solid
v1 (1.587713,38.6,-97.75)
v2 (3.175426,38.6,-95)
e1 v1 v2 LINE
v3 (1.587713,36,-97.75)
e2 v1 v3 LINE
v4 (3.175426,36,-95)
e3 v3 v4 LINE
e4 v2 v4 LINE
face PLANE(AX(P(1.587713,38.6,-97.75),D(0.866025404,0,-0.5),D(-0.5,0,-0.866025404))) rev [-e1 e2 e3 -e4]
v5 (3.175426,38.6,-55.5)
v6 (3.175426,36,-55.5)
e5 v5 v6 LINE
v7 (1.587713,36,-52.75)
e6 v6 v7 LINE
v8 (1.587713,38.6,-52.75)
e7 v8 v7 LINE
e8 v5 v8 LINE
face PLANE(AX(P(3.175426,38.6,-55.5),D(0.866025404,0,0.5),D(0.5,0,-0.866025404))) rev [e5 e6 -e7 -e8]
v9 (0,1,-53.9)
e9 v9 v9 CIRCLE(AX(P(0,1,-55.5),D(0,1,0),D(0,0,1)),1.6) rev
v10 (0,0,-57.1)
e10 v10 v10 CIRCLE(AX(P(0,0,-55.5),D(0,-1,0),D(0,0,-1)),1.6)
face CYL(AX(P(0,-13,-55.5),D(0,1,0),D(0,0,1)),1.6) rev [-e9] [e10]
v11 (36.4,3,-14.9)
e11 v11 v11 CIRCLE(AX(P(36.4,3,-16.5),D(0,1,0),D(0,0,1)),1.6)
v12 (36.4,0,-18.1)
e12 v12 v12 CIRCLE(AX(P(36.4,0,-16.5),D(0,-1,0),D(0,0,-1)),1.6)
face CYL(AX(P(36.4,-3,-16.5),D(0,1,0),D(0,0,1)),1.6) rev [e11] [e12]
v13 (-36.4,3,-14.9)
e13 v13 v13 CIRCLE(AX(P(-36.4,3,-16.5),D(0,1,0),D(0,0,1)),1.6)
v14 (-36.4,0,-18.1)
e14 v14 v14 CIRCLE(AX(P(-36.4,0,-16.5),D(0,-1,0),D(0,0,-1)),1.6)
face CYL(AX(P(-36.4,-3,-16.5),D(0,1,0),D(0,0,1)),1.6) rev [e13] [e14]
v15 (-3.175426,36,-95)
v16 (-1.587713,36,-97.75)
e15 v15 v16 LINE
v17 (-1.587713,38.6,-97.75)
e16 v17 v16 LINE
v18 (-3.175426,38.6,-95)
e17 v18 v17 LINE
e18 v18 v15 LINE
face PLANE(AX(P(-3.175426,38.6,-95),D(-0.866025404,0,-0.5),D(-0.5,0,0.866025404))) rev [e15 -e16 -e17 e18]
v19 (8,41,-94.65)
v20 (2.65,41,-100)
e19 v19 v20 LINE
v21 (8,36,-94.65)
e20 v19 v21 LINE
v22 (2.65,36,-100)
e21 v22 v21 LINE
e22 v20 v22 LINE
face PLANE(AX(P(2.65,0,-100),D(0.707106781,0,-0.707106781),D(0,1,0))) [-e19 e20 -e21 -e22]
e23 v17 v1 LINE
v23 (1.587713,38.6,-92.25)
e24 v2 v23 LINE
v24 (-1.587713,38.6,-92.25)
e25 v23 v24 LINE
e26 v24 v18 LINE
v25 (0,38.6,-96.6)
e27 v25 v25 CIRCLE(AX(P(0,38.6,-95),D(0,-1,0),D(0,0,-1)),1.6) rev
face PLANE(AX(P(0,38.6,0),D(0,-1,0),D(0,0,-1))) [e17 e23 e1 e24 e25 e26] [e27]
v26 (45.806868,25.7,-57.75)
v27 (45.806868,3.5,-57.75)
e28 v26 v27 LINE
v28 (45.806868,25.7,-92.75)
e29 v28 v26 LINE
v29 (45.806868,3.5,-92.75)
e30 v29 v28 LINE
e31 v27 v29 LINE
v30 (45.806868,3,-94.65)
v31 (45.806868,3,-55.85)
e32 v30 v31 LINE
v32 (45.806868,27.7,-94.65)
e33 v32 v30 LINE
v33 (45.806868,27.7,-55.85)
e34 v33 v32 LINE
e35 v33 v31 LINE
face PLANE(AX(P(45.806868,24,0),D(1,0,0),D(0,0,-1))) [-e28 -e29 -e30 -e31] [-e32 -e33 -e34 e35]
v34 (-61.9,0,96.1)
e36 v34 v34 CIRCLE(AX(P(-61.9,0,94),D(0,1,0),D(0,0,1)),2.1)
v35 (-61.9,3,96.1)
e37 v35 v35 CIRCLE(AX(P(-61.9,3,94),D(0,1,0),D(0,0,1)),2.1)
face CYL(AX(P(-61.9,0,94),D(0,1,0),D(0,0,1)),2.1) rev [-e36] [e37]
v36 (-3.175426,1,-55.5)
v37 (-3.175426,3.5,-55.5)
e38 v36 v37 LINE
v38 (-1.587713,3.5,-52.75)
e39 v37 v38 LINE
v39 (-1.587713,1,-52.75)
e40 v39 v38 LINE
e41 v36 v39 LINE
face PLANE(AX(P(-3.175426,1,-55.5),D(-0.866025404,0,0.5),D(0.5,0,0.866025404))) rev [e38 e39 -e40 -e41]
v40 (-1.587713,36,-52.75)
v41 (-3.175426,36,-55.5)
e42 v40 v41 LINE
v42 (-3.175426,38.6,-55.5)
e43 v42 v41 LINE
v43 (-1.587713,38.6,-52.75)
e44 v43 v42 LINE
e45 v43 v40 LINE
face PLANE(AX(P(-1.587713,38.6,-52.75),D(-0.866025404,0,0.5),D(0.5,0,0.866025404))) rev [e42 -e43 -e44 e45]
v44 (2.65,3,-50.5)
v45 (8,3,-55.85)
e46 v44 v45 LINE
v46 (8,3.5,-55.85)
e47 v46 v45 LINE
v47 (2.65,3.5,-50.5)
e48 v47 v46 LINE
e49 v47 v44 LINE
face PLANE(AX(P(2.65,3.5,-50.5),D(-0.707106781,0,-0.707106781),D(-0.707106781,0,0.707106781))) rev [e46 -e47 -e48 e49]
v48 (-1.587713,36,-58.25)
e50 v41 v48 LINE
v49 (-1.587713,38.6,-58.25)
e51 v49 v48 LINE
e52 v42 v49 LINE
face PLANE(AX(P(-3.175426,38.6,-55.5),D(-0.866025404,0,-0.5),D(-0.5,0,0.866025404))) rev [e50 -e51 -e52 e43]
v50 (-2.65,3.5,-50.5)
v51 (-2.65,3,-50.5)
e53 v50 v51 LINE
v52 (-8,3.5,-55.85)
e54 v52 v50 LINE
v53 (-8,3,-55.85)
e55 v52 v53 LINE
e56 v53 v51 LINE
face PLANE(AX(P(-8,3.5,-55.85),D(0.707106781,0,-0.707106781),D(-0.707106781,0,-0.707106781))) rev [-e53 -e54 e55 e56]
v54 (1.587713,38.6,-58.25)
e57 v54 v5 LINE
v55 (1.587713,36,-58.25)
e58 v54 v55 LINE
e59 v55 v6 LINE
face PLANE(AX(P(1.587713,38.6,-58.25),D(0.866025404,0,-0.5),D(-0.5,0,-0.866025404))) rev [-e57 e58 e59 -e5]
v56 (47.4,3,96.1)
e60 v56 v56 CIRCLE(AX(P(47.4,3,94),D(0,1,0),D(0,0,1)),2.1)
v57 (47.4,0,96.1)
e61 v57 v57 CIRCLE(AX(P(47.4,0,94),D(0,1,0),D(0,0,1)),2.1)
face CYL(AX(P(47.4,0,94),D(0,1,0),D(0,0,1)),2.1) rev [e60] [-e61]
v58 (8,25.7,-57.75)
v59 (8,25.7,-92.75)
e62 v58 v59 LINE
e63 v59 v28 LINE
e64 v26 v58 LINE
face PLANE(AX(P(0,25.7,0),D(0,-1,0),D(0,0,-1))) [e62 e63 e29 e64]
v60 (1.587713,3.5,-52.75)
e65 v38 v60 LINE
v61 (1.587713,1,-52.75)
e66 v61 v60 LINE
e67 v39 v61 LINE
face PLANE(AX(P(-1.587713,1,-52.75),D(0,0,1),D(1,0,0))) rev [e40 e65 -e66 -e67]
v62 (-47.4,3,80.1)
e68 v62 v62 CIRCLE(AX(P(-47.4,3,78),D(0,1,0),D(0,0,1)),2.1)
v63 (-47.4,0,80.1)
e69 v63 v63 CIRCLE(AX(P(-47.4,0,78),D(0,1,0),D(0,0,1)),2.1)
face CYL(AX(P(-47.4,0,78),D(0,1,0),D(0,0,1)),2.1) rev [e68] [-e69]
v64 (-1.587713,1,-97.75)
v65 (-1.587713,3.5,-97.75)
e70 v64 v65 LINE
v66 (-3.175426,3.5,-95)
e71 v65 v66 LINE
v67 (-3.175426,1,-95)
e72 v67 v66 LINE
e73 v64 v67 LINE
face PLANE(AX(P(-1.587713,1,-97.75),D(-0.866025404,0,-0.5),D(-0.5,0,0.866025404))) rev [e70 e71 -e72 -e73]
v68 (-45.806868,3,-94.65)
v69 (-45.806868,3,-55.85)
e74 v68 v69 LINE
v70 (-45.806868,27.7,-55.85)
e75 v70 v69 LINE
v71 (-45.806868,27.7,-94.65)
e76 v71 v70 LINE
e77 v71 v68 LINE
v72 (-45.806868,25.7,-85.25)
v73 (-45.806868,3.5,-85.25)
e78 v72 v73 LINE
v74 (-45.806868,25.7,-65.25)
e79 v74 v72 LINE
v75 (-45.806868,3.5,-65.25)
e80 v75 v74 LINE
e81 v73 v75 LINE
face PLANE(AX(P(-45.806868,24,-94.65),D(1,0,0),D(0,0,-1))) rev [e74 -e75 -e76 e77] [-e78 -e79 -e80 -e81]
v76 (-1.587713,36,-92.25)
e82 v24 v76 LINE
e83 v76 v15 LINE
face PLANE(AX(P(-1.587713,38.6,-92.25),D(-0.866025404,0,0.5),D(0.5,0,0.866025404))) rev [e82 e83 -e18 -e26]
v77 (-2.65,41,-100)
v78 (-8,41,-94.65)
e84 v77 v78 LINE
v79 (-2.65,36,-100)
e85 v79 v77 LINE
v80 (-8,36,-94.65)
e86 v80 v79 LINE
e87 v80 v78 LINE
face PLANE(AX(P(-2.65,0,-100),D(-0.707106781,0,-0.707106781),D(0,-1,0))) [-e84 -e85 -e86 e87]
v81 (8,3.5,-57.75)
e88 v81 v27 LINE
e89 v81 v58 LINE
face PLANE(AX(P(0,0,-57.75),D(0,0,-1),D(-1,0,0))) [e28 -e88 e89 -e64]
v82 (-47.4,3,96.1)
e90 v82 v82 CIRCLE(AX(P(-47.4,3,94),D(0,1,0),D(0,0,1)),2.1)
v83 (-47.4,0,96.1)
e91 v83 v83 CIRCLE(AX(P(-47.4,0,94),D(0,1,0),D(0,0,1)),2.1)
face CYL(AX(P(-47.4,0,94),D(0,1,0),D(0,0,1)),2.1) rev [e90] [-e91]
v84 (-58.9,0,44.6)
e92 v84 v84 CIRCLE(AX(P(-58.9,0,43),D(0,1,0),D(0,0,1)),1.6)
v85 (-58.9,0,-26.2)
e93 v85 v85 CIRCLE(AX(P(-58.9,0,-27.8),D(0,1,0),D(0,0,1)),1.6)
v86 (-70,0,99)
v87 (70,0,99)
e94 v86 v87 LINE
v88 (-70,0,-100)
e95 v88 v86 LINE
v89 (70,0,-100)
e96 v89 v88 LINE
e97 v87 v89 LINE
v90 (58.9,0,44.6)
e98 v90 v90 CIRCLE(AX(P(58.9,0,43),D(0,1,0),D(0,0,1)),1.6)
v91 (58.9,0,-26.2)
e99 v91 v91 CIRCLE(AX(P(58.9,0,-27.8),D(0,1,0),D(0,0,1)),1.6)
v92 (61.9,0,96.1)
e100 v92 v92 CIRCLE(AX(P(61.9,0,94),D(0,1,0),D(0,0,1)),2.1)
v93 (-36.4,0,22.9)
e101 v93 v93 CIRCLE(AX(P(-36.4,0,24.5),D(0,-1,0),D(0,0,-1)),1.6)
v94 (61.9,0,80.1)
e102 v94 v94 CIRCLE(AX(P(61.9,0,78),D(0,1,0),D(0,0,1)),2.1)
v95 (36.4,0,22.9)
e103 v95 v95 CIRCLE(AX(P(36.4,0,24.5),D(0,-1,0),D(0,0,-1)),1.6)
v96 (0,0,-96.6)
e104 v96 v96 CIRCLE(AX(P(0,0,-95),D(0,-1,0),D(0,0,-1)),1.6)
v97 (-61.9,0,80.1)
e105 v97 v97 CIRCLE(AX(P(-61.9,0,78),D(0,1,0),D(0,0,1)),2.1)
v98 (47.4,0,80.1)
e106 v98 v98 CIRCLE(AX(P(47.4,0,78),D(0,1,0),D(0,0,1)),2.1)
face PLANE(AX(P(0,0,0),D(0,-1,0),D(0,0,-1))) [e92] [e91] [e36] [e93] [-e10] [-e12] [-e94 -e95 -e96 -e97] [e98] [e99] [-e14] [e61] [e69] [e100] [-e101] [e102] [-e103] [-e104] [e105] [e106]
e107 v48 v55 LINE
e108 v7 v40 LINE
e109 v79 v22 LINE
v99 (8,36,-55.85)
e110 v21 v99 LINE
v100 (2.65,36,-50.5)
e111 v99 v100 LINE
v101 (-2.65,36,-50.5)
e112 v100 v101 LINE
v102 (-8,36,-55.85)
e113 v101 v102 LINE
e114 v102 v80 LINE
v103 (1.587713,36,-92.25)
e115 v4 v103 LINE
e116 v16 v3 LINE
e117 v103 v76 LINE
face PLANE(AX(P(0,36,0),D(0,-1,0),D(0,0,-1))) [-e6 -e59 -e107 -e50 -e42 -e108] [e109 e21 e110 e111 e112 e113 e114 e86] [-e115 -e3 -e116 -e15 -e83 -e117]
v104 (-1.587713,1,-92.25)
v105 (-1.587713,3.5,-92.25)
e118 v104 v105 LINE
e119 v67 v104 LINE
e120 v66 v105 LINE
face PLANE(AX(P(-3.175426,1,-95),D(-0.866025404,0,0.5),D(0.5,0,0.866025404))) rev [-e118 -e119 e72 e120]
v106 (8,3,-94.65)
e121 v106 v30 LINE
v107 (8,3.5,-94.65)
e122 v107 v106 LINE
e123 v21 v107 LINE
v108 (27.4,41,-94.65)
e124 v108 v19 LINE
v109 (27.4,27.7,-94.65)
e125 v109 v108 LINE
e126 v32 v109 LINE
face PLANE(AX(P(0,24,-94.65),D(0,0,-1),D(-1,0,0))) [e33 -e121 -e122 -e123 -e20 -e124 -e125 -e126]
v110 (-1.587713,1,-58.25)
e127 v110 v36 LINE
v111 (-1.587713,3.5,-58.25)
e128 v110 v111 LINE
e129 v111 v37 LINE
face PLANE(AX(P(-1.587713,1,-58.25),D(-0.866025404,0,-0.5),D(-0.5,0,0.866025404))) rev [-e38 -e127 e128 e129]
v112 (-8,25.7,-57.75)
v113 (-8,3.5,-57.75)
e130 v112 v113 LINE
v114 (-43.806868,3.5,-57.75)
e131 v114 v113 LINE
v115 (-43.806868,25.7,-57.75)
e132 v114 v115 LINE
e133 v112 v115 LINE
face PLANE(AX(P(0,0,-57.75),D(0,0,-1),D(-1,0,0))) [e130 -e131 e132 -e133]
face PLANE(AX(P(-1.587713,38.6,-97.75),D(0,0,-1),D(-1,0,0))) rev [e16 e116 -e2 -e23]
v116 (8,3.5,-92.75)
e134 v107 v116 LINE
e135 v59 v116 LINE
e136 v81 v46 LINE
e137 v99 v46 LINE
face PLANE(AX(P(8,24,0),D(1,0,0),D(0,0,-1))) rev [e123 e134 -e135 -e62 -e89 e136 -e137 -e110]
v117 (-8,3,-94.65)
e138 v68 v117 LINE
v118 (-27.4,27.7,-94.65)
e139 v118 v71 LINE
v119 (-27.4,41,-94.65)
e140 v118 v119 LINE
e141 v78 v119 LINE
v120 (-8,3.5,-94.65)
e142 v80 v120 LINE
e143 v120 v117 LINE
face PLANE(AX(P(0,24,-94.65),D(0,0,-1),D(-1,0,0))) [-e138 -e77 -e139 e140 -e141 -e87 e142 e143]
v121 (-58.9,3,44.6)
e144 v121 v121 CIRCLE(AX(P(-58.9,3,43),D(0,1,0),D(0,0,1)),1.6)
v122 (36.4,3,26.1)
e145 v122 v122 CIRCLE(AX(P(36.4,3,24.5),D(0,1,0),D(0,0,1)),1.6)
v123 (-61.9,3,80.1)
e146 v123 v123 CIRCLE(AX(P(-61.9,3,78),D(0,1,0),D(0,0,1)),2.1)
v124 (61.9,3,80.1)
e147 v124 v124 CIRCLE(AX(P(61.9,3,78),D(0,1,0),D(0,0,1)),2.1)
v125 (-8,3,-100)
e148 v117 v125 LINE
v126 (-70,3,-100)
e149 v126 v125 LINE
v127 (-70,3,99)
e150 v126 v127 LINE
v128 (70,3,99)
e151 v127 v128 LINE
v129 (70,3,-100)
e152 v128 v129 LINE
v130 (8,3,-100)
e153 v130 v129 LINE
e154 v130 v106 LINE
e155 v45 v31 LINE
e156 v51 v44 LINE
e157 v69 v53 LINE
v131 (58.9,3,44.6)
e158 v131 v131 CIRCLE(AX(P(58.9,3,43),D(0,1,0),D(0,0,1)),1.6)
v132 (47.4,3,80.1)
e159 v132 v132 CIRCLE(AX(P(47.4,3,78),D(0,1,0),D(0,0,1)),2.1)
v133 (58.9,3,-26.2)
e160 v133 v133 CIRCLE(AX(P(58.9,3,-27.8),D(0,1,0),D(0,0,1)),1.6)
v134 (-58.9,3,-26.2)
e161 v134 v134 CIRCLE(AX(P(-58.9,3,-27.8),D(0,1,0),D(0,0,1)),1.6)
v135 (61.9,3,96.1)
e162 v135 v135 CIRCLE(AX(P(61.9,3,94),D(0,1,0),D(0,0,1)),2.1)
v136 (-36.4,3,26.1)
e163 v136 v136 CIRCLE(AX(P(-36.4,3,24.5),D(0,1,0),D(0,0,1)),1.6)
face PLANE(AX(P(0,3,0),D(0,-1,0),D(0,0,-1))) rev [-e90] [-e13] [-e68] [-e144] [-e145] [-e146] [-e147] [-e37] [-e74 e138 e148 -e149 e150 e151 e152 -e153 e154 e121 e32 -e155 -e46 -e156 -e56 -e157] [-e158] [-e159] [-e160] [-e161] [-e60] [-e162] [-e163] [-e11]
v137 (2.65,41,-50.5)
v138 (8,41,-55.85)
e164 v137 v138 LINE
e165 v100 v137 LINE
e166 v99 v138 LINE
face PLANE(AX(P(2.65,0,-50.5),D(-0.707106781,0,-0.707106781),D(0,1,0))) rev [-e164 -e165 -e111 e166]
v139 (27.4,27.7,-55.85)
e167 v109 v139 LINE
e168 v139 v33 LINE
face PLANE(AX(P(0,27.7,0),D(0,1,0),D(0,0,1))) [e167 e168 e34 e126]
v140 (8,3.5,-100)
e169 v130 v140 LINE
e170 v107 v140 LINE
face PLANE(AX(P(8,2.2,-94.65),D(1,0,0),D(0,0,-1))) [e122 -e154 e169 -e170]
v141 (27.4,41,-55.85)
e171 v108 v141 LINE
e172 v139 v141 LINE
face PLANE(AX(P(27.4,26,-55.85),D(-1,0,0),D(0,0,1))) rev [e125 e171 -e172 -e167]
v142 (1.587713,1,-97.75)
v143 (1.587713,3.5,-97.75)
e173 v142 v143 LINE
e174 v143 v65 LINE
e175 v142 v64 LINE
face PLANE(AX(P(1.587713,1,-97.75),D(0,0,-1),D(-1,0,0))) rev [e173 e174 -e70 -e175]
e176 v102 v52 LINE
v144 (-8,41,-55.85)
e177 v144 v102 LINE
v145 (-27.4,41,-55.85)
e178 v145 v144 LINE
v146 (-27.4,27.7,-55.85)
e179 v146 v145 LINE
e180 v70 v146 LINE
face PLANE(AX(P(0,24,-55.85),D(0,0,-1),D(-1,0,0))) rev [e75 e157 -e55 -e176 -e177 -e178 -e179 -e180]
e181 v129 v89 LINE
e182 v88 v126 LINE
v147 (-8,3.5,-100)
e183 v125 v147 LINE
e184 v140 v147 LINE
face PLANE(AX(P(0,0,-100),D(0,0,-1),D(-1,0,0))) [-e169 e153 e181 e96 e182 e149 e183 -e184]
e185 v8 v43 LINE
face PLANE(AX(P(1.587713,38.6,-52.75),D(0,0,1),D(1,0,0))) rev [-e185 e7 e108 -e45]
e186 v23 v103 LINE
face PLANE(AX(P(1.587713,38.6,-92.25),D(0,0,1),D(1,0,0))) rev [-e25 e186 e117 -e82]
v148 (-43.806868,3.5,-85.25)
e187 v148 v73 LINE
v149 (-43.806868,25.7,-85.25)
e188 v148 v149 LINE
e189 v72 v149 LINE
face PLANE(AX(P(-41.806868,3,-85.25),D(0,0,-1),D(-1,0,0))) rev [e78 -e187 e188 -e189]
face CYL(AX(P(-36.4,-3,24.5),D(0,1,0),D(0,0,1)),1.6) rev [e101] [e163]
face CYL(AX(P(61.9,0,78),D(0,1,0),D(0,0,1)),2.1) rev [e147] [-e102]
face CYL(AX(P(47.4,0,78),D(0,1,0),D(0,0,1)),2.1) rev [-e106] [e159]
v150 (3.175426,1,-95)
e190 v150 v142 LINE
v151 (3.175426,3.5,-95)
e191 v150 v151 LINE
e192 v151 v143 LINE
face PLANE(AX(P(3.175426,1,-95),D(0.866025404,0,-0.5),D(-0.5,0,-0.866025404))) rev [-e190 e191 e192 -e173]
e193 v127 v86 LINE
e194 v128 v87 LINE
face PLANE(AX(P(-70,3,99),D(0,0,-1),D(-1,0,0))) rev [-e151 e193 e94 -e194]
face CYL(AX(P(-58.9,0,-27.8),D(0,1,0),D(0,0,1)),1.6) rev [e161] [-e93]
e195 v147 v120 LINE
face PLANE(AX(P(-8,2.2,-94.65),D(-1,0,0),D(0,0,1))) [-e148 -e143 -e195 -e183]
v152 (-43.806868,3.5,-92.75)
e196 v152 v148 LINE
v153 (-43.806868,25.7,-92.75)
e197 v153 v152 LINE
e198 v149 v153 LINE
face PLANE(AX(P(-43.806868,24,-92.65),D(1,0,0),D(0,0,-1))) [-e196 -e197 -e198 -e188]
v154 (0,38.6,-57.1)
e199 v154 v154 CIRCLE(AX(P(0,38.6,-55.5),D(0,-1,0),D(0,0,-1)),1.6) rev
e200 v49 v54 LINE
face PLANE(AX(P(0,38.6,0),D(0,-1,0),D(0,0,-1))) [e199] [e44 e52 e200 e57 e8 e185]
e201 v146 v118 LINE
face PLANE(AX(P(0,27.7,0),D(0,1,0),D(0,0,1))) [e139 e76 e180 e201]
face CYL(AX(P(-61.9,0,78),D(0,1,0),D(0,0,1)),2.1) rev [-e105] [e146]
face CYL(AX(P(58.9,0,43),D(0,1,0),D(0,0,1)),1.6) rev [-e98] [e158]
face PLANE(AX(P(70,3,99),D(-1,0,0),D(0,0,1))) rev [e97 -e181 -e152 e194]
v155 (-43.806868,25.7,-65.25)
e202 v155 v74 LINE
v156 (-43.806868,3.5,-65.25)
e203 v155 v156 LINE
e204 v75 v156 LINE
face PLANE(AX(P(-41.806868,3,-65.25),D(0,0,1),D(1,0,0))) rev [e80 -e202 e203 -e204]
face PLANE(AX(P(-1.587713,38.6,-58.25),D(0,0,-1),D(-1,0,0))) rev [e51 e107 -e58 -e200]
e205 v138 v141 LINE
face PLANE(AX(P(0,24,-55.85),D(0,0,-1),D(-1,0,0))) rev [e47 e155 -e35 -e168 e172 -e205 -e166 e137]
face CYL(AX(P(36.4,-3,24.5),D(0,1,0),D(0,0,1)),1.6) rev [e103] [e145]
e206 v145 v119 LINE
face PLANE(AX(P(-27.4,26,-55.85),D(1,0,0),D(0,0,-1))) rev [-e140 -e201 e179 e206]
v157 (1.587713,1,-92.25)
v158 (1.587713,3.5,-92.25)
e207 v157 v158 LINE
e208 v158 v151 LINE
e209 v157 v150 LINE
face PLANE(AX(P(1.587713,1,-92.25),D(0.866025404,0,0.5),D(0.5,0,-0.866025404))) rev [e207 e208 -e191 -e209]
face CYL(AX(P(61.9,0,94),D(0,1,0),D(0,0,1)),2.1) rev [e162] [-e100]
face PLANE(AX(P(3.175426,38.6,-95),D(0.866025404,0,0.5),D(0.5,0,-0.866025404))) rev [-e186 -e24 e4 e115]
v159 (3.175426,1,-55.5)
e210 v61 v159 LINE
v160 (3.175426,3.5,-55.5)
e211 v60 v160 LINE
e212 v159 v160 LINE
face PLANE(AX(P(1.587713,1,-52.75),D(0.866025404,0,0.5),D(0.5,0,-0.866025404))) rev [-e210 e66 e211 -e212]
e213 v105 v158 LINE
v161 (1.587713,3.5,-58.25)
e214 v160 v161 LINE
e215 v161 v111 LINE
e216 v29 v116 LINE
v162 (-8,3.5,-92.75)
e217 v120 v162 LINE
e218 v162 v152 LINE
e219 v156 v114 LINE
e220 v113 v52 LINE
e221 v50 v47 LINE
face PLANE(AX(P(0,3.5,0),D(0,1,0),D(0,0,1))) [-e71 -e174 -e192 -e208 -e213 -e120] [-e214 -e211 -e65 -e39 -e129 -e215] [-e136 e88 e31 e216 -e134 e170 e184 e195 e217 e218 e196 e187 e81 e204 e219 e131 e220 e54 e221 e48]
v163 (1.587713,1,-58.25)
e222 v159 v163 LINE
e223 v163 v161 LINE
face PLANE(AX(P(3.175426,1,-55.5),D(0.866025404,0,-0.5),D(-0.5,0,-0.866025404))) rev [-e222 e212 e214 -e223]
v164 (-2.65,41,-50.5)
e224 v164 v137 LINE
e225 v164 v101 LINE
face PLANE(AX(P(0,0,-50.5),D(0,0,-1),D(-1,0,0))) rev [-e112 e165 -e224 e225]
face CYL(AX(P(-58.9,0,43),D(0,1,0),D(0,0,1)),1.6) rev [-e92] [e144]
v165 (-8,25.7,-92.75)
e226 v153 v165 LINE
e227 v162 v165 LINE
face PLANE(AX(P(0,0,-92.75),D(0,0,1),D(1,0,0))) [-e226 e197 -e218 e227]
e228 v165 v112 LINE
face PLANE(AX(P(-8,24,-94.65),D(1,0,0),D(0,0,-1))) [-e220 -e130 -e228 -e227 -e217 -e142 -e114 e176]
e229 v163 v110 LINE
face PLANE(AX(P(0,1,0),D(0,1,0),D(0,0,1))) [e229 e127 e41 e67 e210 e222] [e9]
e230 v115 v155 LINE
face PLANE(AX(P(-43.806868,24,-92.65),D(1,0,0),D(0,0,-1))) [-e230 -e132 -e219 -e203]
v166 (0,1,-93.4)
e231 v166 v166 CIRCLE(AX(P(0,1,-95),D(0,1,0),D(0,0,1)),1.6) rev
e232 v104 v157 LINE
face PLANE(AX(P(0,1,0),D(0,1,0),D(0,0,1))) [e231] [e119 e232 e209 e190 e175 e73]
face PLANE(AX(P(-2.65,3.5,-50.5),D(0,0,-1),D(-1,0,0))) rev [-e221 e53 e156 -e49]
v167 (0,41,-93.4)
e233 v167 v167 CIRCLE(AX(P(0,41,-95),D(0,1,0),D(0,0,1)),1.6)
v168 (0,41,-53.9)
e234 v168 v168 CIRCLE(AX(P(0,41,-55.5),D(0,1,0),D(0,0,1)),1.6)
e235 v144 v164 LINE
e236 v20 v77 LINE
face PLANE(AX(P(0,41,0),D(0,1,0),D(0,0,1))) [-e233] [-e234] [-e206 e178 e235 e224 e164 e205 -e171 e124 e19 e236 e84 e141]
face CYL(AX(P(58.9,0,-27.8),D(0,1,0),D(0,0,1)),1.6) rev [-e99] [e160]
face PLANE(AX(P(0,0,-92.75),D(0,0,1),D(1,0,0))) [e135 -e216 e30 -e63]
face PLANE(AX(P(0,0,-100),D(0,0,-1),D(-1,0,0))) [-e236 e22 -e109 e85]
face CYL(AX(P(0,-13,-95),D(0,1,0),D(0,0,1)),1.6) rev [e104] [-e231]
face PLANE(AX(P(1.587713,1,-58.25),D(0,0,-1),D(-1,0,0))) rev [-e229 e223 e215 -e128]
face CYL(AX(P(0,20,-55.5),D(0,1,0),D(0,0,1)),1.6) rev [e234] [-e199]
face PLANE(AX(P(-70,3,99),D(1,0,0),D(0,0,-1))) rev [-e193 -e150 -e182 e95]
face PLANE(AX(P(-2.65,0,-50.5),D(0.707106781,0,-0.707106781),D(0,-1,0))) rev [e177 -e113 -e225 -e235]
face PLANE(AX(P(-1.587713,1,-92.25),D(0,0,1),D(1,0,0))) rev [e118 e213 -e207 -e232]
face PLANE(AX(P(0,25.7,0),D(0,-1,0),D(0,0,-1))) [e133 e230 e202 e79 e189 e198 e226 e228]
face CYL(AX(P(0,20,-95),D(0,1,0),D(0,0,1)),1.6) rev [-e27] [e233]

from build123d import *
from build123d.topology import SkipClean

# Parameters (mm, degrees)
SKETCH1_W            = 140
SKETCH1_H            = 198
BOSS_EXTRUDE1_DEPTH  = 3
SKETCH2_R            = 2.1
CUT_EXTRUDE1_DEPTH   = 3
SKETCH3_R            = 1.6
CUT_EXTRUDE2_DEPTH   = 3
SKETCH4_W            = 140
SKETCH4_H            = 3
BOSS_EXTRUDE2_DEPTH  = 1
SKETCH5_R            = 1.6
CUT_EXTRUDE3_DEPTH   = 16
BOSS_EXTRUDE3_DEPTH  = 21
SKETCH7_W            = 34.8
SKETCH7_H            = 21
CUT_EXTRUDE4_DEPTH   = 21
SKETCH9_W            = 91.613735238
SKETCH9_H            = 38.8
BOSS_EXTRUDE4_DEPTH  = 2
SKETCH12_W           = 20
SKETCH12_H           = 23
CUT_EXTRUDE8_DEPTH   = 4
SKETCH13_W           = 20
SKETCH13_H           = 2
BOSS_EXTRUDE5_DEPTH  = 4
SKETCH15_W           = 16
SKETCH15_H           = 2
BOSS_EXTRUDE6_DEPTH  = 5.35
SKETCH16_W           = 16
SKETCH16_H           = 2
BOSS_EXTRUDE7_DEPTH  = 5.35
SKETCH17_R           = 1.6
CUT_EXTRUDE9_DEPTH   = 6
CHAMFER1_SIZE        = 5.35
SKETCH18_R           = 1.6
CUT_EXTRUDE10_DEPTH  = 6
BOSS_EXTRUDE8_START  = 15
SKETCH19_R           = 1.6
BOSS_EXTRUDE8_DEPTH  = 15
CUT_EXTRUDE11_DEPTH  = 12
SKETCH21_W           = 18.406867619
SKETCH21_H           = 38.8
CUT_EXTRUDE12_DEPTH  = 15
SKETCH22_W           = 37.806867619
SKETCH22_H           = 34.8
CUT_EXTRUDE13_DEPTH  = 1
SKETCH23_W           = 18.406867619
SKETCH23_H           = 38.8
BOSS_EXTRUDE9_DEPTH  = 1
SKETCH24_W           = 37.806867619
SKETCH24_H           = 22
SKETCH24_W_2         = 35.806867619
CUT_EXTRUDE14_DEPTH  = 0.1
SKETCH25_W           = 37.806867619
SKETCH25_H           = 22
SKETCH25_W_2         = 35.806867619
CUT_EXTRUDE15_DEPTH  = 0.1
CUT_EXTRUDE16_DEPTH  = 2.6
CUT_EXTRUDE17_DEPTH  = 2
SKETCH28_W           = 37.806867619
SKETCH28_H           = 35
CUT_EXTRUDE18_DEPTH  = 0.5
SKETCH29_W           = 18.406867619
SKETCH29_H           = 38.8
CUT_EXTRUDE19_DEPTH  = 0.5
SKETCH30_W           = 37.806867619
SKETCH30_H           = 35
BOSS_EXTRUDE10_DEPTH = 0.5
SKETCH31_R           = 1.6
BOSS_EXTRUDE11_DEPTH = 0.5
CUT_EXTRUDE20_DEPTH  = 2.5
SKETCH33_W           = 37.806867619
SKETCH33_H           = 35
CUT_EXTRUDE21_DEPTH  = 0.2
BOSS_EXTRUDE12_DEPTH = 1.3
SKETCH35_W           = 18.406867619
SKETCH35_H           = 38.8
BOSS_EXTRUDE13_DEPTH = 1.2


with BuildPart() as part:
    # Sketch1 → Boss-Extrude1 (new body)
    with BuildSketch(Plane(origin=(0, 0, 0), x_dir=(1, 0, 0), z_dir=(0, 1, 0))):
        Rectangle(SKETCH1_W, SKETCH1_H)
    extrude(amount=BOSS_EXTRUDE1_DEPTH)

    # Sketch2 → Cut-Extrude1 (cut)
    with BuildSketch(Plane(origin=(0, 3, 0), x_dir=(1, 0, 0), z_dir=(0, 1, 0))):
        with Locations(Location((-47.4, -94, 0), (0, 0, 270))):
            Circle(SKETCH2_R)
        with Locations(Location((47.4, -94, 0), (0, 0, 270))):
            Circle(SKETCH2_R)
        with Locations(Location((-61.9, -94, 0), (0, 0, 270))):
            Circle(SKETCH2_R)
        with Locations(Location((61.9, -94, 0), (0, 0, 270))):
            Circle(SKETCH2_R)
        with Locations(Location((-47.4, -78, 0), (0, 0, 270))):
            Circle(SKETCH2_R)
        with Locations(Location((-61.9, -78, 0), (0, 0, 270))):
            Circle(SKETCH2_R)
        with Locations(Location((61.9, -78, 0), (0, 0, 270))):
            Circle(SKETCH2_R)
        with Locations(Location((47.4, -78, 0), (0, 0, 270))):
            Circle(SKETCH2_R)
    extrude(amount=-CUT_EXTRUDE1_DEPTH, mode=Mode.SUBTRACT)

    # Sketch3 → Cut-Extrude2 (cut)
    with BuildSketch(Plane(origin=(0, 3, 0), x_dir=(1, 0, 0), z_dir=(0, 1, 0))):
        with Locations(Location((-58.9, 27.8, 0), (0, 0, 270))):
            Circle(SKETCH3_R)
        with Locations(Location((-58.9, -43, 0), (0, 0, 270))):
            Circle(SKETCH3_R)
        with Locations(Location((58.9, -43, 0), (0, 0, 270))):
            Circle(SKETCH3_R)
        with Locations(Location((58.9, 27.8, 0), (0, 0, 270))):
            Circle(SKETCH3_R)
    extrude(amount=-CUT_EXTRUDE2_DEPTH, mode=Mode.SUBTRACT)

    # Sketch4 → Boss-Extrude2 (add)
    with BuildSketch(Plane(origin=(0, 0, -99), x_dir=(-1, 0, 0), z_dir=(0, 0, -1))):
        with Locations((0, 1.5)):
            Rectangle(SKETCH4_W, SKETCH4_H)
    extrude(amount=BOSS_EXTRUDE2_DEPTH)

    # Sketch5 → Cut-Extrude3 (cut)
    with BuildSketch(Plane(origin=(0, 3, 0), x_dir=(1, 0, 0), z_dir=(0, 1, 0))):
        with Locations(Location((0, 95, 0), (0, 0, 270))):
            Circle(SKETCH5_R)
        with Locations(Location((0, 55.5, 0), (0, 0, 270))):
            Circle(SKETCH5_R)
    extrude(amount=-CUT_EXTRUDE3_DEPTH, mode=Mode.SUBTRACT)

    # Sketch6 → Boss-Extrude3 (add)
    with BuildSketch(Plane(origin=(0, 3, 0), x_dir=(1, 0, 0), z_dir=(0, 1, 0))):
        Polygon((-45.806867619, 94.65), (-8, 94.65), (-8, 92.65), (-43.806867619, 92.65), (-43.806867619, 57.85), (-8, 57.85), (-8, 55.85), (-45.806867619, 55.85), align=None)
        Polygon((43.806867619, 92.65), (43.806867619, 57.85), (8, 57.85), (8, 55.85), (45.806867619, 55.85), (45.806867619, 94.65), (8, 94.65), (8, 92.65), align=None)
    extrude(amount=BOSS_EXTRUDE3_DEPTH)

    # Sketch7 → Cut-Extrude4 (cut)
    with BuildSketch(Plane.ZY.offset(-43.806867619)):
        with Locations((-75.25, 13.5)):
            Rectangle(SKETCH7_W, SKETCH7_H)
    extrude(amount=-CUT_EXTRUDE4_DEPTH, mode=Mode.SUBTRACT)

    # Sketch9 → Boss-Extrude4 (add)
    with BuildSketch(Plane(origin=(0, 24, 0), x_dir=(1, 0, 0), z_dir=(0, 1, 0))):
        with Locations((0, 75.25)):
            Rectangle(SKETCH9_W, SKETCH9_H)
    extrude(amount=BOSS_EXTRUDE4_DEPTH)

    # Sketch12 → Cut-Extrude8 (cut)
    with BuildSketch(Plane.ZY.offset(45.806867619)):
        with Locations((-75.25, 14.5)):
            Rectangle(SKETCH12_W, SKETCH12_H)
    extrude(amount=-CUT_EXTRUDE8_DEPTH, mode=Mode.SUBTRACT)

    # Sketch13 → Boss-Extrude5 (add)
    with BuildSketch(Plane.ZY.offset(41.806867619)):
        with Locations((-75.25, 25)):
            Rectangle(SKETCH13_W, SKETCH13_H)
    extrude(amount=BOSS_EXTRUDE5_DEPTH)

    # Sketch15 → Boss-Extrude6 (add)
    with BuildSketch(Plane.XY.offset(-55.85)):
        with Locations((0, 25)):
            Rectangle(SKETCH15_W, SKETCH15_H)
    extrude(amount=BOSS_EXTRUDE6_DEPTH)

    # Sketch16 → Boss-Extrude7 (add)
    with BuildSketch(Plane(origin=(0, 0, -94.65), x_dir=(-1, 0, 0), z_dir=(0, 0, -1))):
        with Locations((0, 25)):
            Rectangle(SKETCH16_W, SKETCH16_H)
    extrude(amount=BOSS_EXTRUDE7_DEPTH)

    # Sketch17 → Cut-Extrude9 (cut)
    with BuildSketch(Plane(origin=(0, 26, 0), x_dir=(1, 0, 0), z_dir=(0, 1, 0))):
        with Locations(Location((0, 55.5, 0), (0, 0, 270))):
            Circle(SKETCH17_R)
        with Locations(Location((0, 95, 0), (0, 0, 270))):
            Circle(SKETCH17_R)
    extrude(amount=-CUT_EXTRUDE9_DEPTH, mode=Mode.SUBTRACT)

    # Chamfer1
    chamfer1_edges = [part.edges().sort_by_distance(p)[0] for p in [
        (-8, 25, -50.5),
        (8, 25, -50.5),
        (8, 25, -100),
        (-8, 25, -100),
    ]]
    chamfer(chamfer1_edges, length=CHAMFER1_SIZE - 0.0001)  # a hair under: the kernel refuses the full size

    # Sketch18 → Cut-Extrude10 (cut)
    with BuildSketch(Plane(origin=(0, 3, 0), x_dir=(1, 0, 0), z_dir=(0, 1, 0))):
        with Locations(Location((36.4, -24.5, 0), (0, 0, 270))):
            Circle(SKETCH18_R)
        with Locations(Location((36.4, 16.5, 0), (0, 0, 270))):
            Circle(SKETCH18_R)
        with Locations(Location((-36.4, 16.5, 0), (0, 0, 270))):
            Circle(SKETCH18_R)
        with Locations(Location((-36.4, -24.5, 0), (0, 0, 270))):
            Circle(SKETCH18_R)
    extrude(amount=-CUT_EXTRUDE10_DEPTH, mode=Mode.SUBTRACT)

    # Sketch19 → Boss-Extrude8 (add)
    with SkipClean():  # the faces are left unmerged after this step: merging them gives an invalid solid
        with BuildSketch(Plane(origin=(0, 26, 0), x_dir=(1, 0, 0), z_dir=(0, 1, 0)).offset(BOSS_EXTRUDE8_START)):
            Polygon((-45.806867619, 55.85), (-8, 55.85), (-2.65, 50.5), (2.65, 50.5), (8, 55.85), (45.806867619, 55.85), (45.806867619, 94.65), (8, 94.65), (2.65, 100), (-2.65, 100), (-8, 94.65), (-45.806867619, 94.65), align=None)
            with Locations(Location((0, 95, 0), (0, 0, 270))):
                Circle(SKETCH19_R, mode=Mode.SUBTRACT)
            with Locations(Location((0, 55.5, 0), (0, 0, 270))):
                Circle(SKETCH19_R, mode=Mode.SUBTRACT)
        extrude(amount=-BOSS_EXTRUDE8_DEPTH)

    # Sketch20 → Cut-Extrude11 (cut)
    with SkipClean():  # the faces are left unmerged after this step: merging them gives an invalid solid
        with BuildSketch(Plane.XZ.offset(-24)):
            Polygon((-8, -55.85), (-8, -94.65), (-2.65, -100), (2.65, -100), (8, -94.65), (8, -55.85), (2.65, -50.5), (-2.65, -50.5), align=None)
        extrude(amount=-CUT_EXTRUDE11_DEPTH, mode=Mode.SUBTRACT)


with BuildPart() as cut_extrude11_kept_piece:
    # of the separate pieces the step leaves, the one the design keeps (cut_extrude11_pieces_kept)
    add(part.part.solids().sort_by_distance((-45.806867619, 26, -94.65))[0])

    # Sketch21 → Cut-Extrude12 (cut)
    with BuildSketch(Plane(origin=(0, 41, 0), x_dir=(1, 0, 0), z_dir=(0, 1, 0))):
        with Locations((-36.60343381, 75.25)):
            Rectangle(SKETCH21_W, SKETCH21_H)
        with Locations((36.60343381, 75.25)):
            Rectangle(SKETCH21_W, SKETCH21_H)
    extrude(amount=-CUT_EXTRUDE12_DEPTH, mode=Mode.SUBTRACT)

    # Sketch22 → Cut-Extrude13 (cut)
    with BuildSketch(Plane.XZ.offset(-24)):
        with Locations((26.90343381, -75.25)):
            Rectangle(SKETCH22_W, SKETCH22_H)
        Polygon((-43.806867619, -92.65), (-8, -92.65), (-8, -57.85), (-43.806867619, -57.85), (-43.806867619, -65.25), (-45.806867619, -65.25), (-45.806867619, -85.25), (-43.806867619, -85.25), align=None)
    extrude(amount=-CUT_EXTRUDE13_DEPTH, mode=Mode.SUBTRACT)

    # Sketch23 → Boss-Extrude9 (add)
    with BuildSketch(Plane(origin=(0, 26, 0), x_dir=(1, 0, 0), z_dir=(0, 1, 0))):
        with Locations((36.60343381, 75.25)):
            Rectangle(SKETCH23_W, SKETCH23_H)
        with Locations((-36.60343381, 75.25)):
            Rectangle(SKETCH23_W, SKETCH23_H)
    extrude(amount=BOSS_EXTRUDE9_DEPTH)

    # Sketch24 → Cut-Extrude14 (cut)
    with BuildSketch(Plane(origin=(0, 0, -57.85), x_dir=(-1, 0, 0), z_dir=(0, 0, -1))):
        with Locations((-26.90343381, 14)):
            Rectangle(SKETCH24_W, SKETCH24_H)
        with Locations((25.90343381, 14)):
            Rectangle(SKETCH24_W_2, SKETCH24_H)
    extrude(amount=-CUT_EXTRUDE14_DEPTH, mode=Mode.SUBTRACT)

    # Sketch25 → Cut-Extrude15 (cut)
    with BuildSketch(Plane.XY.offset(-92.65)):
        with Locations((26.90343381, 14)):
            Rectangle(SKETCH25_W, SKETCH25_H)
        with Locations((-25.90343381, 14)):
            Rectangle(SKETCH25_W_2, SKETCH25_H)
    extrude(amount=-CUT_EXTRUDE15_DEPTH, mode=Mode.SUBTRACT)

    # Sketch26 → Cut-Extrude16 (cut)
    with BuildSketch(Plane.XZ.offset(-36)):
        Polygon((3.175426481, -55.5), (1.58771324, -52.75), (-1.58771324, -52.75), (-3.175426481, -55.5), (-1.58771324, -58.25), (1.58771324, -58.25), align=None)
        Polygon((3.175426481, -95), (1.58771324, -92.25), (-1.58771324, -92.25), (-3.175426481, -95), (-1.58771324, -97.75), (1.58771324, -97.75), align=None)
    extrude(amount=-CUT_EXTRUDE16_DEPTH, mode=Mode.SUBTRACT)

    # Sketch27 → Cut-Extrude17 (cut)
    with BuildSketch(Plane(origin=(0, 3, 0), x_dir=(1, 0, 0), z_dir=(0, 1, 0))):
        Polygon((3.175426481, 55.5), (1.58771324, 58.25), (-1.58771324, 58.25), (-3.175426481, 55.5), (-1.58771324, 52.75), (1.58771324, 52.75), align=None)
    extrude(amount=-CUT_EXTRUDE17_DEPTH, mode=Mode.SUBTRACT)

    # Sketch28 → Cut-Extrude18 (cut)
    with BuildSketch(Plane.XZ.offset(-25)):
        Polygon((-43.806867619, -85.25), (-43.806867619, -92.75), (-8, -92.75), (-8, -57.75), (-43.806867619, -57.75), (-43.806867619, -65.25), (-45.806867619, -65.25), (-45.806867619, -85.25), align=None)
        with Locations((26.90343381, -75.25)):
            Rectangle(SKETCH28_W, SKETCH28_H)
    extrude(amount=-CUT_EXTRUDE18_DEPTH, mode=Mode.SUBTRACT)

    # Sketch29 → Cut-Extrude19 (cut)
    with BuildSketch(Plane(origin=(0, 27, 0), x_dir=(1, 0, 0), z_dir=(0, 1, 0))):
        with Locations((36.60343381, 75.25)):
            Rectangle(SKETCH29_W, SKETCH29_H)
        with Locations((-36.60343381, 75.25)):
            Rectangle(SKETCH29_W, SKETCH29_H)
    extrude(amount=-CUT_EXTRUDE19_DEPTH, mode=Mode.SUBTRACT)

    # Sketch30 → Boss-Extrude10 (add)
    with BuildSketch(Plane(origin=(0, 3, 0), x_dir=(1, 0, 0), z_dir=(0, 1, 0))):
        with Locations((26.90343381, 75.25)):
            Rectangle(SKETCH30_W, SKETCH30_H)
        Polygon((-43.806867619, 85.25), (-45.806867619, 85.25), (-45.806867619, 65.25), (-43.806867619, 65.25), (-43.806867619, 57.75), (-8, 57.75), (-8, 92.75), (-43.806867619, 92.75), align=None)
    extrude(amount=BOSS_EXTRUDE10_DEPTH)

    # Sketch31 → Boss-Extrude11 (add)
    with BuildSketch(Plane(origin=(0, 3, 0), x_dir=(1, 0, 0), z_dir=(0, 1, 0))):
        Polygon((-27.4, 94.65), (-27.4, 55.85), (-8, 55.85), (-2.65, 50.5), (2.65, 50.5), (8, 55.85), (27.4, 55.85), (27.4, 94.65), (8, 94.65), (2.65, 100), (-2.65, 100), (-8, 94.65), align=None)
        with Locations(Location((0, 95, 0), (0, 0, 270))):
            Circle(SKETCH31_R, mode=Mode.SUBTRACT)
        Polygon((1.58771324, 52.75), (3.175426481, 55.5), (1.58771324, 58.25), (-1.58771324, 58.25), (-3.175426481, 55.5), (-1.58771324, 52.75), align=None, mode=Mode.SUBTRACT)
    extrude(amount=BOSS_EXTRUDE11_DEPTH)

    # Sketch32 → Cut-Extrude20 (cut)
    with BuildSketch(Plane(origin=(0, 3.5, 0), x_dir=(1, 0, 0), z_dir=(0, 1, 0))):
        Polygon((3.175426481, 95), (1.58771324, 97.75), (-1.58771324, 97.75), (-3.175426481, 95), (-1.58771324, 92.25), (1.58771324, 92.25), align=None)
    extrude(amount=-CUT_EXTRUDE20_DEPTH, mode=Mode.SUBTRACT)

    # Sketch33 → Cut-Extrude21 (cut)
    with BuildSketch(Plane.XZ.offset(-25.5)):
        with Locations((26.90343381, -75.25)):
            Rectangle(SKETCH33_W, SKETCH33_H)
        Polygon((-45.806867619, -85.25), (-43.806867619, -85.25), (-43.806867619, -92.75), (-8, -92.75), (-8, -57.75), (-43.806867619, -57.75), (-43.806867619, -65.25), (-45.806867619, -65.25), align=None)
    extrude(amount=-CUT_EXTRUDE21_DEPTH, mode=Mode.SUBTRACT)

    # Sketch34 → Boss-Extrude12 (add)
    with BuildSketch(Plane(origin=(0, 3.5, 0), x_dir=(1, 0, 0), z_dir=(0, 1, 0))):
        Polygon((2.65, 100), (8, 100), (8, 94.65), align=None)
        Polygon((-8, 94.65), (-8, 100), (-2.65, 100), align=None)
    extrude(amount=-BOSS_EXTRUDE12_DEPTH)

    # Sketch35 → Boss-Extrude13 (add)
    with BuildSketch(Plane(origin=(0, 26.5, 0), x_dir=(1, 0, 0), z_dir=(0, 1, 0))):
        with Locations((36.60343381, 75.25)):
            Rectangle(SKETCH35_W, SKETCH35_H)
        with Locations((-36.60343381, 75.25)):
            Rectangle(SKETCH35_W, SKETCH35_H)
    extrude(amount=BOSS_EXTRUDE13_DEPTH)


solid = cut_extrude11_kept_piece.part
